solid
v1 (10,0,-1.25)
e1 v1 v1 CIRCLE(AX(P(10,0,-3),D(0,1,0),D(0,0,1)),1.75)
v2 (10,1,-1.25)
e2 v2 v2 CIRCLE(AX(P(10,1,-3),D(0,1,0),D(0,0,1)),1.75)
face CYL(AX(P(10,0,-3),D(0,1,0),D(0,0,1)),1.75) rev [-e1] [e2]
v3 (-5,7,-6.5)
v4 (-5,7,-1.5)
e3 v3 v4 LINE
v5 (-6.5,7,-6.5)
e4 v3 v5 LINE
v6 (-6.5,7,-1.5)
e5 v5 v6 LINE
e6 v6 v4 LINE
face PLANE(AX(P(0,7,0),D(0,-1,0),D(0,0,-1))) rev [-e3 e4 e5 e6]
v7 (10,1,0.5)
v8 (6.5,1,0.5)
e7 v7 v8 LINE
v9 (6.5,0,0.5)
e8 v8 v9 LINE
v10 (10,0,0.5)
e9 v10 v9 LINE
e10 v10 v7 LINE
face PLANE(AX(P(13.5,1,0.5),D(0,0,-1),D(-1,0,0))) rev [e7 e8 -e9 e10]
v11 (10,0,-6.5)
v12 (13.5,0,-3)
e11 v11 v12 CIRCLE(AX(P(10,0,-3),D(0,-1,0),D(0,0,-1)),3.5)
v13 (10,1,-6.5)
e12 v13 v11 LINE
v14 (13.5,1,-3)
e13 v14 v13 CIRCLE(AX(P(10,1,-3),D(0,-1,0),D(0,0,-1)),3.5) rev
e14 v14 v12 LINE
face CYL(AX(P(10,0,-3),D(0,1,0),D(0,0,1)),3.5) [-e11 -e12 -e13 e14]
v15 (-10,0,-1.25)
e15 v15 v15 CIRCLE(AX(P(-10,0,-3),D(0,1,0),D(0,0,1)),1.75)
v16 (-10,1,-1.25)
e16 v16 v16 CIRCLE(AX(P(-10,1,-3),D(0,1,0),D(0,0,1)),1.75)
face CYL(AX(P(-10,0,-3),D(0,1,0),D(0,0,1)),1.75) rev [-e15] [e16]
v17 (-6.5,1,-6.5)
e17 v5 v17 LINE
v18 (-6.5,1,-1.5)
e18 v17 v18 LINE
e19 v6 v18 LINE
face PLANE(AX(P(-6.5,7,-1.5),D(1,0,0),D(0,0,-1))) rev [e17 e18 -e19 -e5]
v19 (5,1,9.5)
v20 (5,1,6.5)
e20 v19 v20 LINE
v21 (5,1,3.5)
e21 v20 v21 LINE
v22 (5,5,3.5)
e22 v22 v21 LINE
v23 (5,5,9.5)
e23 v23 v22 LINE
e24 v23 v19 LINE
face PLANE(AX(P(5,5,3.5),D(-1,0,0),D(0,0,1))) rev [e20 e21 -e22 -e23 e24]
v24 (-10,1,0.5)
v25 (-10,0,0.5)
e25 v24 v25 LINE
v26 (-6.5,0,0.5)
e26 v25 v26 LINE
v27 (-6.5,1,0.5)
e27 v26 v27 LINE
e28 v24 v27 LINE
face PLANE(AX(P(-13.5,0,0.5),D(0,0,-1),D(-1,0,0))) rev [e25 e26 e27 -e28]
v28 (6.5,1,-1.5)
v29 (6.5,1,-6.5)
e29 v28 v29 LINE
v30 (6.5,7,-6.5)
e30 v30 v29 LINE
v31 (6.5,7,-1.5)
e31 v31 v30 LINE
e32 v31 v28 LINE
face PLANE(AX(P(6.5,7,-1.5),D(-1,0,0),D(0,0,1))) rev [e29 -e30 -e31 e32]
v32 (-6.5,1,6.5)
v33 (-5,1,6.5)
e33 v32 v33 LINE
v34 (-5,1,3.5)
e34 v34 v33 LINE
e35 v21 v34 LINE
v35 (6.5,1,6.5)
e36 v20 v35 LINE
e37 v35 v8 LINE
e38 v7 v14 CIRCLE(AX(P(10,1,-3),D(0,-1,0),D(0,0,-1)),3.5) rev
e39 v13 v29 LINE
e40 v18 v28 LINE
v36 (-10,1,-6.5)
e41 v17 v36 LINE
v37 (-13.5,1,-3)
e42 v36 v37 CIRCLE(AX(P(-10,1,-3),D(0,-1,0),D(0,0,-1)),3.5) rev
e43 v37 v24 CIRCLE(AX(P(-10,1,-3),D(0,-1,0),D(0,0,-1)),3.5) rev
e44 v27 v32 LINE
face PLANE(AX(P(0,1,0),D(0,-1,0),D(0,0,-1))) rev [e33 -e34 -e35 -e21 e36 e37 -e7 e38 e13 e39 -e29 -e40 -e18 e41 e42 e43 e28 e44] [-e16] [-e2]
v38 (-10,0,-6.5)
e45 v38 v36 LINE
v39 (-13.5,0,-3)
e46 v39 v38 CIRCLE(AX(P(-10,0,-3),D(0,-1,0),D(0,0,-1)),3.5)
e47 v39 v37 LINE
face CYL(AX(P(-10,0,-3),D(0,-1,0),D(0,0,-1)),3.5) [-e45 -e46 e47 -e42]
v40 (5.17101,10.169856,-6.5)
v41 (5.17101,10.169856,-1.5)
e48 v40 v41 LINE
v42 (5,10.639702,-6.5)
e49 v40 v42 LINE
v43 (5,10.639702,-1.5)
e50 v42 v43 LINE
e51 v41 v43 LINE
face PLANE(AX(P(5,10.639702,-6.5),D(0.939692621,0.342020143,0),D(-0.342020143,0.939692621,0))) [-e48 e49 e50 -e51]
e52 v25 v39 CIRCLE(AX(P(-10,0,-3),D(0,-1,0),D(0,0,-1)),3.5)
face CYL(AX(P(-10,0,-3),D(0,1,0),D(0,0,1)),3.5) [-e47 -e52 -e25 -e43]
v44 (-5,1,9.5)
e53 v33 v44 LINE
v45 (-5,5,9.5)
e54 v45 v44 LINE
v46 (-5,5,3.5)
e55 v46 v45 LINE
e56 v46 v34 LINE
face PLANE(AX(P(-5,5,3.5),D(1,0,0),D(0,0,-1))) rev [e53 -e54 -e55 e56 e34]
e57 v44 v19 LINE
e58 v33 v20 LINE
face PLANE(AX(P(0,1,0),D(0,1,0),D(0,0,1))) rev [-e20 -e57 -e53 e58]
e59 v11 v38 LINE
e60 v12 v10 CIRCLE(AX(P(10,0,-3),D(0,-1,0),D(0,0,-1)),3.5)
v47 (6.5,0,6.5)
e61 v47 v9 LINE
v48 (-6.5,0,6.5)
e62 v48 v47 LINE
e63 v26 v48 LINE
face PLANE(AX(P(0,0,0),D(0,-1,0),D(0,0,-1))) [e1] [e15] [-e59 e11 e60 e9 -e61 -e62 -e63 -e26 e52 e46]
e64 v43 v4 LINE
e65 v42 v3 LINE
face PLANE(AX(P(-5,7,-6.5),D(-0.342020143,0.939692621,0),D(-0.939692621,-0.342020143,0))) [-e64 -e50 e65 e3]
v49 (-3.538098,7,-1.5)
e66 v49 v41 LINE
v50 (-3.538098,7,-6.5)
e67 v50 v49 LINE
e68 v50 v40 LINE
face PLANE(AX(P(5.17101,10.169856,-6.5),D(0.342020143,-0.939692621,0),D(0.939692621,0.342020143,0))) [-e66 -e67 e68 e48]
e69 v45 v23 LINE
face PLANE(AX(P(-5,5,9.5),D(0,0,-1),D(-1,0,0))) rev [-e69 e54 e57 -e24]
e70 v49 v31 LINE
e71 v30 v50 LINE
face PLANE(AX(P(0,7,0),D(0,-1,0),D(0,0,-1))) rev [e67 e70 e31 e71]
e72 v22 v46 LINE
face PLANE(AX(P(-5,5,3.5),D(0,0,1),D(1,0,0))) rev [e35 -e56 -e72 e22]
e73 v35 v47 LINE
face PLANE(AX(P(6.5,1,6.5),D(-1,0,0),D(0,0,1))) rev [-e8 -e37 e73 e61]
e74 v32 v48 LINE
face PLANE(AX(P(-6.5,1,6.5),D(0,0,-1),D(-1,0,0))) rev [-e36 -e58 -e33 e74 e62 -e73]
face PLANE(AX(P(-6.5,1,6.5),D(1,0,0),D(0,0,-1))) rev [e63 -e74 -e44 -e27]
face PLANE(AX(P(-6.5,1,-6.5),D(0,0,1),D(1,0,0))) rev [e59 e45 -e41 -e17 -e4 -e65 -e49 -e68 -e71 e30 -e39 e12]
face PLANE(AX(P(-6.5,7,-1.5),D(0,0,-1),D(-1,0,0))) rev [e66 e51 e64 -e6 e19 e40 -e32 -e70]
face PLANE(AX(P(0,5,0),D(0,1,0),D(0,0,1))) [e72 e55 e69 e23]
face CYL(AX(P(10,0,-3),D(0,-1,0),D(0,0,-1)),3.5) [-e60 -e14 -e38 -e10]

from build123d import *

# Parameters (mm, degrees)
SKETCH1_W           = 13
SKETCH1_H           = 13
BOSS_EXTRUDE1_DEPTH = 1
SKETCH4_W           = 7
SKETCH4_H           = 1
BOSS_EXTRUDE2_DEPTH = 7
SKETCH5_W           = 7
SKETCH5_H           = 1
BOSS_EXTRUDE3_DEPTH = 7
SKETCH6_R           = 1.75
CUT_EXTRUDE1_DEPTH  = 16.016657418
SKETCH7_W           = 10
SKETCH7_H           = 6
BOSS_EXTRUDE4_DEPTH = 4
SKETCH8_W           = 13
SKETCH8_H           = 5
BOSS_EXTRUDE5_DEPTH = 6
BOSS_EXTRUDE6_DEPTH = 5
FILLET1_R           = 3.5


with BuildPart() as part:
    # Sketch1 → Boss-Extrude1 (new body)
    with BuildSketch(Plane(origin=(0, 0, 0), x_dir=(1, 0, 0), z_dir=(0, 1, 0))):
        Rectangle(SKETCH1_W, SKETCH1_H)
    extrude(amount=BOSS_EXTRUDE1_DEPTH)

    # Sketch4 → Boss-Extrude2 (add)
    with BuildSketch(Plane.ZY.offset(6.5)):
        with Locations((-3, 0.5)):
            Rectangle(SKETCH4_W, SKETCH4_H)
    extrude(amount=BOSS_EXTRUDE2_DEPTH)

    # Sketch5 → Boss-Extrude3 (add)
    with BuildSketch(Plane(origin=(6.5, 0, 0), x_dir=(0, 0, -1), z_dir=(1, 0, 0))):
        with Locations((3, 0.5)):
            Rectangle(SKETCH5_W, SKETCH5_H)
    extrude(amount=BOSS_EXTRUDE3_DEPTH)

    # Sketch6 → Cut-Extrude1 (cut, through all)
    with BuildSketch(Plane(origin=(0, 1, 0), x_dir=(1, 0, 0), z_dir=(0, 1, 0))):
        with Locations(Location((-10, 3, 0), (0, 0, 270))):
            Circle(SKETCH6_R)
        with Locations(Location((10, 3, 0), (0, 0, 270))):
            Circle(SKETCH6_R)
    extrude(amount=-CUT_EXTRUDE1_DEPTH, mode=Mode.SUBTRACT)

    # Sketch7 → Boss-Extrude4 (add)
    with BuildSketch(Plane(origin=(0, 1, 0), x_dir=(1, 0, 0), z_dir=(0, 1, 0))):
        with Locations((0, -6.5)):
            Rectangle(SKETCH7_W, SKETCH7_H)
    extrude(amount=BOSS_EXTRUDE4_DEPTH)

    # Sketch8 → Boss-Extrude5 (add)
    with BuildSketch(Plane(origin=(0, 1, 0), x_dir=(1, 0, 0), z_dir=(0, 1, 0))):
        with Locations((0, 4)):
            Rectangle(SKETCH8_W, SKETCH8_H)
    extrude(amount=BOSS_EXTRUDE5_DEPTH)

    # Sketch9 → Boss-Extrude6 (add)
    with BuildSketch(Plane.XY.offset(-1.5)):
        Polygon((-5, 7), (5, 10.639702343), (5.171010072, 10.169856032), (-3.5380978, 7), align=None)
    extrude(amount=-BOSS_EXTRUDE6_DEPTH)

    # Fillet1
    fillet1_edges = [part.edges().sort_by_distance(p)[0] for p in [
        (13.5, 0.5, -6.5),
        (13.5, 0.5, 0.5),
        (-13.5, 0.5, -6.5),
        (-13.5, 0.5, 0.5),
    ]]
    fillet(fillet1_edges, radius=FILLET1_R - 0.0001)  # a hair under: the kernel refuses the full size


solid = part.part
